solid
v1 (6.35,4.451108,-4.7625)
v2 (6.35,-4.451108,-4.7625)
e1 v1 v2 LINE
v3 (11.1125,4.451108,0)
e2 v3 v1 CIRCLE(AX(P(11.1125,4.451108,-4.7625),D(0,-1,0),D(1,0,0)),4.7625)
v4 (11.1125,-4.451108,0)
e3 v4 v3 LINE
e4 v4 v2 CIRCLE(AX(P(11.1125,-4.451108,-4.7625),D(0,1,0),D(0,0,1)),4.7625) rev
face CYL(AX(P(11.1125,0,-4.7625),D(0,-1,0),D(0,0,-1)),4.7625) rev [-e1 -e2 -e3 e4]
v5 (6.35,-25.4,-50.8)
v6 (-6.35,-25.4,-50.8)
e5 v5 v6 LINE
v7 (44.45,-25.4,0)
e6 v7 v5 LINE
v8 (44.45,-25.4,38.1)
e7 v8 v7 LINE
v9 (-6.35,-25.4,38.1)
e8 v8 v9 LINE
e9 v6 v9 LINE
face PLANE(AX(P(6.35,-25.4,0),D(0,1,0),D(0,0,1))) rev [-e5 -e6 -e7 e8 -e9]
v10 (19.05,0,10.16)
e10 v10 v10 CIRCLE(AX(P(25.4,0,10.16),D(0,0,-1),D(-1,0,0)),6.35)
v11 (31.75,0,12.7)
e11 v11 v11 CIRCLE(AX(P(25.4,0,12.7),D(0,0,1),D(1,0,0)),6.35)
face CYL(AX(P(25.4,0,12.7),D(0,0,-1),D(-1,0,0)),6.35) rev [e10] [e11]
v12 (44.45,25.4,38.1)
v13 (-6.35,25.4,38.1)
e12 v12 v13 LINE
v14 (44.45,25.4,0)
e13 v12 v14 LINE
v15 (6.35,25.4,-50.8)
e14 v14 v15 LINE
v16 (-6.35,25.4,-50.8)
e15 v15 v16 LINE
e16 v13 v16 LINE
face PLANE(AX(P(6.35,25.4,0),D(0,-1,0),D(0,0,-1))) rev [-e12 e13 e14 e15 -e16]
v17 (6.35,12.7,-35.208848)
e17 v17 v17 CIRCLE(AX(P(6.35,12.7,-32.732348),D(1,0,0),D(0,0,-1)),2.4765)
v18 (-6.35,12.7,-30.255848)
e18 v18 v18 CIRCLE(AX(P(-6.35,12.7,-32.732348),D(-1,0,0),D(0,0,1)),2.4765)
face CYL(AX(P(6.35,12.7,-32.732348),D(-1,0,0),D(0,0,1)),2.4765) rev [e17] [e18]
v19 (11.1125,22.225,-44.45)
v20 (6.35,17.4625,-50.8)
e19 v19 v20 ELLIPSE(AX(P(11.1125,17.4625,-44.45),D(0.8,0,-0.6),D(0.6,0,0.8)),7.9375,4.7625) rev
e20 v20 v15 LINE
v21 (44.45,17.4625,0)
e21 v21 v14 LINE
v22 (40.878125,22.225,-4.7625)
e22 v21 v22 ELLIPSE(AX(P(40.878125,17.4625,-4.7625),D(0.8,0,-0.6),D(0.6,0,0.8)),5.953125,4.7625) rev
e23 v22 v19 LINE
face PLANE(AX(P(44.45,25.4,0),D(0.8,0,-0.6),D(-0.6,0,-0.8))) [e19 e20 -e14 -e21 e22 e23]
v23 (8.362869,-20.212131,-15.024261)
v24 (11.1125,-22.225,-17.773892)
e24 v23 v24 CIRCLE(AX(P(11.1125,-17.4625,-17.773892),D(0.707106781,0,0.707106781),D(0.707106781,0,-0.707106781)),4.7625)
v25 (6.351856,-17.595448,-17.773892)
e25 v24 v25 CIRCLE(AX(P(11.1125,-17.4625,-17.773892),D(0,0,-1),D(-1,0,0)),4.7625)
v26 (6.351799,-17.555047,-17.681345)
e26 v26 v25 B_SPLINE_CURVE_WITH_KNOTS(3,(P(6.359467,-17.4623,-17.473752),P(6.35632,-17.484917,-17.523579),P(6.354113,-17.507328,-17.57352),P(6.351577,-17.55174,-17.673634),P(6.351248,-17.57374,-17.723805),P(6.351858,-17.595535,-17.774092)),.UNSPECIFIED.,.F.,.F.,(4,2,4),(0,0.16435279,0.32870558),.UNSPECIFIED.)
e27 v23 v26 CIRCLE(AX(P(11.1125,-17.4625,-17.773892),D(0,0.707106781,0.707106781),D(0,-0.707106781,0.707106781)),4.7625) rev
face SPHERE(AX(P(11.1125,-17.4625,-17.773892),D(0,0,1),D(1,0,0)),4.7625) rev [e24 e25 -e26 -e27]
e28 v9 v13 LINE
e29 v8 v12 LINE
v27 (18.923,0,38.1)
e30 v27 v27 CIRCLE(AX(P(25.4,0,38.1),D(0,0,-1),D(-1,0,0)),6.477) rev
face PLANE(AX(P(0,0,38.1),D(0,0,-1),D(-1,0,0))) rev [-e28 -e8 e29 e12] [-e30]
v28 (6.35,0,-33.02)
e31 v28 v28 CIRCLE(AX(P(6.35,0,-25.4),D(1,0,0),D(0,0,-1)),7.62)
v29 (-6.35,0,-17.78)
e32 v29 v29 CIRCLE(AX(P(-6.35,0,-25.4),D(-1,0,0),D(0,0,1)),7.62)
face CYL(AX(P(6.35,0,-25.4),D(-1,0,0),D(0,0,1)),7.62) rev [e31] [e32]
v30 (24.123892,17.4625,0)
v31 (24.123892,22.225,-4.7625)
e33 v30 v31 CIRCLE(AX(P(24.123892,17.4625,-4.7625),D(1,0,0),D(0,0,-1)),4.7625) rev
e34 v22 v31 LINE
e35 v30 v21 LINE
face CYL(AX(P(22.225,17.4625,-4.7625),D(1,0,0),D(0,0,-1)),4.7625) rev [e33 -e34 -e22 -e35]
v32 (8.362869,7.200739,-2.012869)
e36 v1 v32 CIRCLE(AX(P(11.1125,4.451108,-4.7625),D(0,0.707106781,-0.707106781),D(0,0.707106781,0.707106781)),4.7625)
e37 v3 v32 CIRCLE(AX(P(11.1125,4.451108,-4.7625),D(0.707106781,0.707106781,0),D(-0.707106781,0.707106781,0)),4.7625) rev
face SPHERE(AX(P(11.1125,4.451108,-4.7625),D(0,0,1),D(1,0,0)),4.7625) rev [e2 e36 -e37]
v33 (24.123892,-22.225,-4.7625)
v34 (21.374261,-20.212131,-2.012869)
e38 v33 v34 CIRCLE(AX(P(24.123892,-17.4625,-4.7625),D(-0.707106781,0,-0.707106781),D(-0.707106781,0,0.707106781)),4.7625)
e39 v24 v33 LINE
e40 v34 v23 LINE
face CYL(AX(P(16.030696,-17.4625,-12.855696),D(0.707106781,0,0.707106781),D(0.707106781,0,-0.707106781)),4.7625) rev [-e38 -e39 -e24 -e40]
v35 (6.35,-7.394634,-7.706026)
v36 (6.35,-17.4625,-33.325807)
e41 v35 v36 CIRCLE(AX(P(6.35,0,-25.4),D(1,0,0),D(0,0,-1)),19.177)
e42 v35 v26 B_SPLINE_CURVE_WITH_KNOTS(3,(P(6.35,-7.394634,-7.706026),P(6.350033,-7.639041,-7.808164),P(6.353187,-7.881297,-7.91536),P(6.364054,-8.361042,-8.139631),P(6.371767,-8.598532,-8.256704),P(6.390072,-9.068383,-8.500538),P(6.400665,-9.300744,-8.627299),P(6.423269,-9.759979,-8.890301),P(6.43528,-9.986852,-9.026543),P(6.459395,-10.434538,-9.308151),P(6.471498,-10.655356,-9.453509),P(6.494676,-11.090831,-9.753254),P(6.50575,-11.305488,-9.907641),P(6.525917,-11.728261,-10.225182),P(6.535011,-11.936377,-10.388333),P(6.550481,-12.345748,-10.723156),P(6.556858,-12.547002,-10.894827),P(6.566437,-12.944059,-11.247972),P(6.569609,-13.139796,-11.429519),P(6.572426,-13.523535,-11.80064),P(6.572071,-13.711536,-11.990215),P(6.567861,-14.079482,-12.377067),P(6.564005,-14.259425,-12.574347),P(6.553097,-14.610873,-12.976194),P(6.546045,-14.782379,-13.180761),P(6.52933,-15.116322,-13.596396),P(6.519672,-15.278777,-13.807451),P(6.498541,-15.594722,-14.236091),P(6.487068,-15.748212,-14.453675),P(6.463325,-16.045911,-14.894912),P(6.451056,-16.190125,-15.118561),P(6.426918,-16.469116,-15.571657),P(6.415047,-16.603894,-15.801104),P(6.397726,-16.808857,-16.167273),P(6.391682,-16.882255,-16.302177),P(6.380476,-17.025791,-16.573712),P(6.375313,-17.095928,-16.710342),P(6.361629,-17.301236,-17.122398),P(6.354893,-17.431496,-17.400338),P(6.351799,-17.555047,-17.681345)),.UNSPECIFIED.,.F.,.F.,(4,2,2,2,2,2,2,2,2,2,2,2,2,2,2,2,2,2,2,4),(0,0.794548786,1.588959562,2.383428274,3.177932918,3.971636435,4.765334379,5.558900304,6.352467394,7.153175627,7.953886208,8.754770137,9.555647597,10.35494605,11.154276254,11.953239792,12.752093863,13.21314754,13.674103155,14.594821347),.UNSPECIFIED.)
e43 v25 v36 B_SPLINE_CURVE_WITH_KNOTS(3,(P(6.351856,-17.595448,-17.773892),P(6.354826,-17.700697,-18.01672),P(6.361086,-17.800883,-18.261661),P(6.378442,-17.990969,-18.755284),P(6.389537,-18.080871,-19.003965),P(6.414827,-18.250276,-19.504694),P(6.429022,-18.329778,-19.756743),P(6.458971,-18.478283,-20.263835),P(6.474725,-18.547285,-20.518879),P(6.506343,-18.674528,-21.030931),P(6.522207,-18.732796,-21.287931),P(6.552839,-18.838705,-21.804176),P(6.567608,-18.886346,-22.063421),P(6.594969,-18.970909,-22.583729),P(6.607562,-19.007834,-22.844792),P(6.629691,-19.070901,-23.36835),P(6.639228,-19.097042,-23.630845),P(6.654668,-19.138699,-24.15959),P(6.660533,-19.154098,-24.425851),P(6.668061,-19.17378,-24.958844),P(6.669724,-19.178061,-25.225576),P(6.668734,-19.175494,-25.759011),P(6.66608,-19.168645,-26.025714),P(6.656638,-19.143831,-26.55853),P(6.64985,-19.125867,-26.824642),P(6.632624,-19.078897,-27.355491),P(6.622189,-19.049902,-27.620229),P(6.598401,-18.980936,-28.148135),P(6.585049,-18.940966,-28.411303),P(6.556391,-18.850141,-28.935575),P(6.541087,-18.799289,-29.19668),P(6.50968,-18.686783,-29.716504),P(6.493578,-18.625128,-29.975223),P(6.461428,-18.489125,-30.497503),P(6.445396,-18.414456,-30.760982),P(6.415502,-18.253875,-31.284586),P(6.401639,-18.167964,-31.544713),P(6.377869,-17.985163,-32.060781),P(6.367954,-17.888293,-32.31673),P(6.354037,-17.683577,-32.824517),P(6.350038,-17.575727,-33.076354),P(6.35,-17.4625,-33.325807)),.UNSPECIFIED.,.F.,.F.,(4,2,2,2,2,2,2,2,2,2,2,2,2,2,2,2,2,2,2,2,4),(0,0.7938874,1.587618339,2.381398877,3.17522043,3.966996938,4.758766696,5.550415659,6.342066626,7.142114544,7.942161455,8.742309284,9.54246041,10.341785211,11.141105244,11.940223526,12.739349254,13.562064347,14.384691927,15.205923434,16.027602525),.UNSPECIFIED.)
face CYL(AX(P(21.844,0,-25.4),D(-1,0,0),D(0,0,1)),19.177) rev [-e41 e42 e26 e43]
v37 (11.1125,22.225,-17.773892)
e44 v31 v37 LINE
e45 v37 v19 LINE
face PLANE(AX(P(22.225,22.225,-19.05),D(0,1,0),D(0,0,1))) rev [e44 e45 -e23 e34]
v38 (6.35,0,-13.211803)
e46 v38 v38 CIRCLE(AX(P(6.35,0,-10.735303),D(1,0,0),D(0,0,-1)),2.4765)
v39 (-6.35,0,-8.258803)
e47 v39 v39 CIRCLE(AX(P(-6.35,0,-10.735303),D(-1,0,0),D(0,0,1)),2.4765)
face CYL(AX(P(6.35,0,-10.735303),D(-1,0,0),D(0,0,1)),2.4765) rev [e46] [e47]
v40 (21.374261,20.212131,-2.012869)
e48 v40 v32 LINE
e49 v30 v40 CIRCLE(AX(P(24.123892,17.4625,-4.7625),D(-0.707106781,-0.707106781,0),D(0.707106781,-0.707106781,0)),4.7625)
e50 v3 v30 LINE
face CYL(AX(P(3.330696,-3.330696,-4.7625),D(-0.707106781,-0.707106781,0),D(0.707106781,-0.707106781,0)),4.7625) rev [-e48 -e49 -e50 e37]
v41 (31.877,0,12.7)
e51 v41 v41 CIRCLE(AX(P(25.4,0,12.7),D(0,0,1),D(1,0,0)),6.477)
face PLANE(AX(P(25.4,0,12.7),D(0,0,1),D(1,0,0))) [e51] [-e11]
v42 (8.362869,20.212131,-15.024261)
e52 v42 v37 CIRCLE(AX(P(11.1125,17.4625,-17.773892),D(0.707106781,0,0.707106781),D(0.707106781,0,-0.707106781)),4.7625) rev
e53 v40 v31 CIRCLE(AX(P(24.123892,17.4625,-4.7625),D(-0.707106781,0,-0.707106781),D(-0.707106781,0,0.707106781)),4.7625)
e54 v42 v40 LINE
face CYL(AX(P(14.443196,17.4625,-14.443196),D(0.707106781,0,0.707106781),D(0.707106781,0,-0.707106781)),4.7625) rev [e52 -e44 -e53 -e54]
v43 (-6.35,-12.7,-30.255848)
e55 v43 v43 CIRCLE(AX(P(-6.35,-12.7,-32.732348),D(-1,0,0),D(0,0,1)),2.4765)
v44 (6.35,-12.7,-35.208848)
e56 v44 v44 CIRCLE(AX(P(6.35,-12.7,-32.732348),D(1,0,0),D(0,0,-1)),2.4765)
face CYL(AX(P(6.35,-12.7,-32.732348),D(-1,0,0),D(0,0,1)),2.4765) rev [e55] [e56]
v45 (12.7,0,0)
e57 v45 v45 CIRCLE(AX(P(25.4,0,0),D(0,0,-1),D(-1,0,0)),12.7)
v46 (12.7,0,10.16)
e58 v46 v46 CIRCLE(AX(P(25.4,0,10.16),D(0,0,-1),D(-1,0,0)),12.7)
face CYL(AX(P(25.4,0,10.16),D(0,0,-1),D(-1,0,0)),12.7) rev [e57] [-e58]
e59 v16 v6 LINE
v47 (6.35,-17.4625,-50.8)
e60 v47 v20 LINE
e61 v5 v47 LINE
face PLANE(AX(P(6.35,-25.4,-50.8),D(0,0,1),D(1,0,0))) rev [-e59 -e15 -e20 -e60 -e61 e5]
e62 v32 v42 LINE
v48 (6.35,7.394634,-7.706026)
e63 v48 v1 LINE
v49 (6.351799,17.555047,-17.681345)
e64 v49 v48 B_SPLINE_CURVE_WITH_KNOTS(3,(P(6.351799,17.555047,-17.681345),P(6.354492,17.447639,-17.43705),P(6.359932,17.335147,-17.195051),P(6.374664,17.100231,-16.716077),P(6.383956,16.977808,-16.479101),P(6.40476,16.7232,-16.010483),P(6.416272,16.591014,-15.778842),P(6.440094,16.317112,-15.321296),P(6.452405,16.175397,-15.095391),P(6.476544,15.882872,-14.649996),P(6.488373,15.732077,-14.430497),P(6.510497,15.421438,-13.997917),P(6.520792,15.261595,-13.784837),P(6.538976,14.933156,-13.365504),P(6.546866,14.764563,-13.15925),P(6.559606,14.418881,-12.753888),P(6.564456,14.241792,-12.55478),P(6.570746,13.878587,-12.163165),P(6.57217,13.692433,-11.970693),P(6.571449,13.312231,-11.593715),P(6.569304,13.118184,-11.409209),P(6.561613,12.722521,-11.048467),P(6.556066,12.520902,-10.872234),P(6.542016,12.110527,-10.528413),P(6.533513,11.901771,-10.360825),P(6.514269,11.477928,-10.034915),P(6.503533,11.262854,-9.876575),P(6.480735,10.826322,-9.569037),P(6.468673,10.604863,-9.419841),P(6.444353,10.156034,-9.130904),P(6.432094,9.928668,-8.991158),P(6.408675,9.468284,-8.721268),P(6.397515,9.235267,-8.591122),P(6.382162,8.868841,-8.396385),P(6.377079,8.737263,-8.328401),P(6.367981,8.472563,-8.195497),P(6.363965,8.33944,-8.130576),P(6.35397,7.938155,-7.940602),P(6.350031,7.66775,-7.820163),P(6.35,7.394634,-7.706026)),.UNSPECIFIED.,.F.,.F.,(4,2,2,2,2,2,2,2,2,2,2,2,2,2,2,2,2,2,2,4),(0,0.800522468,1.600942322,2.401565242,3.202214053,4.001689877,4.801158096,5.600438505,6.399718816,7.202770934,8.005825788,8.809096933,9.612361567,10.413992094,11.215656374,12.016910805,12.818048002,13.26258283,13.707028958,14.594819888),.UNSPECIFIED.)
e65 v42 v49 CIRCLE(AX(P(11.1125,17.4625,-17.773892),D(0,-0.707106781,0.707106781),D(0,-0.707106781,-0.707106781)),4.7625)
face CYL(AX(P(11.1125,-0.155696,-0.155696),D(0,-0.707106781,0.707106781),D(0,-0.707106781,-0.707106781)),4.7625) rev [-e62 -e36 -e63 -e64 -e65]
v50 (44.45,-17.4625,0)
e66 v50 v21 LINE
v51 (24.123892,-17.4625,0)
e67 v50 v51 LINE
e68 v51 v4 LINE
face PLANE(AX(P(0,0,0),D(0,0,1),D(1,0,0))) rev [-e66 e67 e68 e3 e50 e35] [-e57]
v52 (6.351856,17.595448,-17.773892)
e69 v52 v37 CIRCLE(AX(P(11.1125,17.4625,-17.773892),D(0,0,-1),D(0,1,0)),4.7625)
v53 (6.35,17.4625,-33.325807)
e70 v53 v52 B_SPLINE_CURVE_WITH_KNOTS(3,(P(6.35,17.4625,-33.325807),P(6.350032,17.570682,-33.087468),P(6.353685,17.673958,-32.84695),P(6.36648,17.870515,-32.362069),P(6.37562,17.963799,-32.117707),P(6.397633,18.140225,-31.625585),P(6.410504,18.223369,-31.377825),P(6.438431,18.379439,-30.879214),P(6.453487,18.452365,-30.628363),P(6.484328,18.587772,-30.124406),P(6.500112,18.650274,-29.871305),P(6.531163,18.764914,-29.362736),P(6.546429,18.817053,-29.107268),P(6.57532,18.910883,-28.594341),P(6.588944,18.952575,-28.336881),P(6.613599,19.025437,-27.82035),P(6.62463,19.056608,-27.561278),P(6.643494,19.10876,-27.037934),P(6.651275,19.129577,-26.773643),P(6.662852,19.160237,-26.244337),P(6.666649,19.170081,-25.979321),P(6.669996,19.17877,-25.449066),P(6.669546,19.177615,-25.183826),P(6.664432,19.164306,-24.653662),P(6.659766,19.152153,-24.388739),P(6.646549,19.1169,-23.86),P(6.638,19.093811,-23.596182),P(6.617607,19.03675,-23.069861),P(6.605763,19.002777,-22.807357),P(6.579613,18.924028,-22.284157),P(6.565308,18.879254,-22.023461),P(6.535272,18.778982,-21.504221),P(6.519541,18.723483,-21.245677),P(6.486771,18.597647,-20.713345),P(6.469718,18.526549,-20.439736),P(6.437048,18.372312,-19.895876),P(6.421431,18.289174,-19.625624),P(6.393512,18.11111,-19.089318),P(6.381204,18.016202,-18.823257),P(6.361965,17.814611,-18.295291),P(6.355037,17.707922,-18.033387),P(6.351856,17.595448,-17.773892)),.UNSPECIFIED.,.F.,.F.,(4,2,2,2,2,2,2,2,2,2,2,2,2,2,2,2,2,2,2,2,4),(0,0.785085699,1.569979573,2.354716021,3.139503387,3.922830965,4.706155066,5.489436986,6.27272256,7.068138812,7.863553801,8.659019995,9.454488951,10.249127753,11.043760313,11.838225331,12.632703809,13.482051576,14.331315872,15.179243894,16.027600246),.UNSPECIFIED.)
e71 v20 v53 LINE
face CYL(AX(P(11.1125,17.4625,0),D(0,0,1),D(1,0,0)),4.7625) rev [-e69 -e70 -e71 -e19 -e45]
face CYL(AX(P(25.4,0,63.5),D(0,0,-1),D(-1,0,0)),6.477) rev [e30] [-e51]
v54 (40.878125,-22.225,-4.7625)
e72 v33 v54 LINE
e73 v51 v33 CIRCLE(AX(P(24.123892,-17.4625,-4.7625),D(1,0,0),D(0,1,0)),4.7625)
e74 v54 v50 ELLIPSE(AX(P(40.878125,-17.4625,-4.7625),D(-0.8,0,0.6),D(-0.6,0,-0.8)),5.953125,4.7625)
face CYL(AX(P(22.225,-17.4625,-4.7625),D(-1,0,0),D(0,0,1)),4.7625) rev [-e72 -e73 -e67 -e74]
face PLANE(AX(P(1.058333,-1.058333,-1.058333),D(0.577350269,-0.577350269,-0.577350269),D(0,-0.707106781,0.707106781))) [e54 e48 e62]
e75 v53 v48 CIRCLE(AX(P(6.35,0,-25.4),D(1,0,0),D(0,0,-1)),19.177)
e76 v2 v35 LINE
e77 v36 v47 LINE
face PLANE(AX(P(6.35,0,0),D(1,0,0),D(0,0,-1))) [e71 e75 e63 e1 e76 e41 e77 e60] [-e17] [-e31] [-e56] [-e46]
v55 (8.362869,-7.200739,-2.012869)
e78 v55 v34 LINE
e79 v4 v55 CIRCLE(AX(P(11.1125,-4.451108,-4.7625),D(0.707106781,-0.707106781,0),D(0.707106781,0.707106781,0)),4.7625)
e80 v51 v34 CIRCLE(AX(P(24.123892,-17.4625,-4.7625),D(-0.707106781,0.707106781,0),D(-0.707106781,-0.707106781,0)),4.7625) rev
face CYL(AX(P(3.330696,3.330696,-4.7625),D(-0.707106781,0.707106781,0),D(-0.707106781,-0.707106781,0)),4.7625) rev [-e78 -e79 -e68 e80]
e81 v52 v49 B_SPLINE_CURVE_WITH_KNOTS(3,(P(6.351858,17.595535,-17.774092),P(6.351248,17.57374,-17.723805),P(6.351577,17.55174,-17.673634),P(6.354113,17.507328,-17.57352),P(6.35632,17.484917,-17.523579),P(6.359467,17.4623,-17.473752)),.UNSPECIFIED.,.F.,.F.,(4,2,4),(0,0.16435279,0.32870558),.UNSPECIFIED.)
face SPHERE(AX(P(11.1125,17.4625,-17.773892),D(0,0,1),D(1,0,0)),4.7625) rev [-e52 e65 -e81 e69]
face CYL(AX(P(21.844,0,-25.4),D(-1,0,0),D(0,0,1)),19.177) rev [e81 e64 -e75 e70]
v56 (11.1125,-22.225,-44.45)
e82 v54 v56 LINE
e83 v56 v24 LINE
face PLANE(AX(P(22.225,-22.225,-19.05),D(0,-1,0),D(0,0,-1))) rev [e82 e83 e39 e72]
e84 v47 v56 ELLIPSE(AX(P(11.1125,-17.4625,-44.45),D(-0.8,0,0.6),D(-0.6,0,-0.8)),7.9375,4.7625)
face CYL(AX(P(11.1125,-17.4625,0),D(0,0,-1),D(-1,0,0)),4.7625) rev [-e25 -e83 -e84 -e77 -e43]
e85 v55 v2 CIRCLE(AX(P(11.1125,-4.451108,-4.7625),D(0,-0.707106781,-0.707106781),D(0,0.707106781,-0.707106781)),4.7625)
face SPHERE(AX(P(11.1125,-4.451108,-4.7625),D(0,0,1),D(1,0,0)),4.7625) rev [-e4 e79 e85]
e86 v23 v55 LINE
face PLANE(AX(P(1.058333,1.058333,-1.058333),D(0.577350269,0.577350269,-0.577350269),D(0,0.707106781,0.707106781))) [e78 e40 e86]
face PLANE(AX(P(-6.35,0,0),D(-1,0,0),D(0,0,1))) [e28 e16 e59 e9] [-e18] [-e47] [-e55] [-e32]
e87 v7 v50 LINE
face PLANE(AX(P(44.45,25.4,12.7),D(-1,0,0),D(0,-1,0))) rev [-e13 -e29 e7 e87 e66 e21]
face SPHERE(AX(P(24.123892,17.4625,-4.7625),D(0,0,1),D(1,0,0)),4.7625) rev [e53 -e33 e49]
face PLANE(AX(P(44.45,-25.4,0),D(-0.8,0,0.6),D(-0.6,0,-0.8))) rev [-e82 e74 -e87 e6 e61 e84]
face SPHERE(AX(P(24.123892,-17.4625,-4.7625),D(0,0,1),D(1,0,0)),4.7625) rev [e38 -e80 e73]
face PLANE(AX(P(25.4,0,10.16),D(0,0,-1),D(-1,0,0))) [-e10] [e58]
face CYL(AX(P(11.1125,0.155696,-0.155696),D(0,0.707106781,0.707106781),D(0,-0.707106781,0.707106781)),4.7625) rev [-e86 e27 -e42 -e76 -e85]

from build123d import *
from build123d.topology import SkipClean

# Parameters (mm, degrees)
SKETCH2_W           = 50.8
SKETCH2_H           = 50.8
SKETCH2_R           = 7.62
SKETCH2_R_2         = 2.4765
BOSS_EXTRUDE1_DEPTH = 6.35
SKETCH3_W           = 44.45
SKETCH3_H           = 50.8
SKETCH3_R           = 6.35
BOSS_EXTRUDE2_DEPTH = 12.7
SKETCH9_R           = 12.7
CUT_EXTRUDE2_DEPTH  = 10.16
RIB8_REACH          = 86.481
SKETCH13_WALL_W     = 234.462510634
SKETCH13_WALL_H     = 3.175
RIB9_REACH          = 86.481
SKETCH14_WALL_W     = 234.462510634
SKETCH14_WALL_H     = 3.175
BOSS_EXTRUDE5_REACH = 73.113
FILLET2_R           = 4.7625
SKETCH22_W          = 44.45
SKETCH22_H          = 50.8
BOSS_EXTRUDE6_DEPTH = 25.4
SKETCH20_R          = 6.477
CUT_EXTRUDE3_DEPTH  = 50.8
SKETCH23_R          = 19.177
CUT_EXTRUDE4_DEPTH  = 15.494
BOSS_EXTRUDE7_START = 6.35
SKETCH25_W          = 88.9
SKETCH25_H          = 50.8
SKETCH25_R          = 2.4765
SKETCH25_R_2        = 7.62
BOSS_EXTRUDE7_DEPTH = 6.35


with BuildPart() as part:
    # Sketch2 → Boss-Extrude1 (new body)
    with BuildSketch(Plane(origin=(0, 0, 0), x_dir=(0, 0, -1), z_dir=(1, 0, 0))):
        with Locations((25.4, 0)):
            Rectangle(SKETCH2_W, SKETCH2_H)
        with Locations((25.4, 0)):
            Circle(SKETCH2_R, mode=Mode.SUBTRACT)
        with Locations((32.732348419, 12.7)):
            Circle(SKETCH2_R_2, mode=Mode.SUBTRACT)
        with Locations((32.732348419, -12.7)):
            Circle(SKETCH2_R_2, mode=Mode.SUBTRACT)
        with Locations((10.735303163, 0)):
            Circle(SKETCH2_R_2, mode=Mode.SUBTRACT)
    extrude(amount=BOSS_EXTRUDE1_DEPTH)

    # Sketch3 → Boss-Extrude2 (add)
    with BuildSketch(Plane.XY):
        with Locations((22.225, 0)):
            Rectangle(SKETCH3_W, SKETCH3_H)
        with Locations((25.4, 0)):
            Circle(SKETCH3_R, mode=Mode.SUBTRACT)
    extrude(amount=BOSS_EXTRUDE2_DEPTH)

    # Sketch9 → Cut-Extrude2 (cut)
    with BuildSketch(Plane(origin=(0, 0, 0), x_dir=(-1, 0, 0), z_dir=(0, 0, -1))):
        with Locations((-25.4, 0)):
            Circle(SKETCH9_R)
    extrude(amount=-CUT_EXTRUDE2_DEPTH, mode=Mode.SUBTRACT)

    # Sketch13 wall → Rib8 (add, up to next)
    with BuildSketch(Plane(origin=(25.4, 25.4, -25.4), x_dir=(-0.6, 0, -0.8), z_dir=(-0.8, 0, 0.6)), mode=Mode.PRIVATE) as rib8_sk1:
        with Locations((0, 1.5875)):
            Rectangle(SKETCH13_WALL_W, SKETCH13_WALL_H)
    rib8_tool1 = extrude(rib8_sk1.sketch, amount=RIB8_REACH, mode=Mode.PRIVATE) - part.part
    add(rib8_tool1.solids().sort_by_distance((25.4, 25.4, -25.4))[0])

    # Sketch14 wall → Rib9 (add, up to next)
    with BuildSketch(Plane(origin=(25.4, -25.4, -25.4), x_dir=(-0.6, 0, -0.8), z_dir=(0.8, 0, -0.6)), mode=Mode.PRIVATE) as rib9_sk1:
        with Locations((0, 1.5875)):
            Rectangle(SKETCH14_WALL_W, SKETCH14_WALL_H)
    rib9_tool1 = extrude(rib9_sk1.sketch, amount=-RIB9_REACH, mode=Mode.PRIVATE) - part.part
    add(rib9_tool1.solids().sort_by_distance((25.4, -25.4, -25.4))[0])

    # Sketch17 → Boss-Extrude5 (add, up to next)
    with BuildSketch(Plane(origin=(1.058333333, 1.058333333, -1.058333333), x_dir=(0.8164965809277261, -0.408248290463863, 0.408248290463863), z_dir=(-0.5773502691896257, -0.5773502691896258, 0.5773502691896258)), mode=Mode.PRIVATE) as boss_extrude5_sk1:
        Polygon((6.480941611, -29.185832393), (6.480941611, -2.24506403), (29.812331411, -15.715448212), align=None)
    boss_extrude5_tool1 = extrude(boss_extrude5_sk1.sketch, amount=BOSS_EXTRUDE5_REACH, mode=Mode.PRIVATE) - part.part
    boss_extrude5 = boss_extrude5_tool1.solids().sort_by_distance((12.7, -15.875, -6.35))[0]
    add(boss_extrude5)

    # Mirror1: Boss-Extrude5 across plane
    add(boss_extrude5.mirror(Plane.ZX))

    # Fillet2
    fillet2_edges = [part.edges().sort_by_distance(p)[0] for p in [
        (34.925, 22.225, 0),
        (6.35, 22.225, -34.925),
        (6.35, -22.225, -34.925),
        (34.925, -22.225, 0),
        (6.35, 0, 0),
        (15.875, 22.225, -9.525),
        (15.875, 12.7, 0),
        (6.35, 12.7, -9.525),
        (6.35, -12.7, -9.525),
        (15.875, -22.225, -9.525),
        (15.875, -12.7, 0),
    ]]
    fillet(fillet2_edges, radius=FILLET2_R)

    # Sketch22 → Boss-Extrude6 (add)
    with BuildSketch(Plane.XY.offset(12.7)):
        with Locations((22.225, 0)):
            Rectangle(SKETCH22_W, SKETCH22_H)
    extrude(amount=BOSS_EXTRUDE6_DEPTH)

    # Sketch20 → Cut-Extrude3 (cut)
    with BuildSketch(Plane.XY.offset(12.7)):
        with Locations((25.4, 0)):
            Circle(SKETCH20_R)
    extrude(amount=CUT_EXTRUDE3_DEPTH, mode=Mode.SUBTRACT)

    # Sketch23 → Cut-Extrude4 (cut)
    with BuildSketch(Plane(origin=(6.35, 0, 0), x_dir=(0, 0, -1), z_dir=(1, 0, 0))):
        with Locations((25.4, 0)):
            Circle(SKETCH23_R)
    extrude(amount=CUT_EXTRUDE4_DEPTH, mode=Mode.SUBTRACT)

    # Sketch25 → Boss-Extrude7 (add)
    with SkipClean():  # the faces are left unmerged after this step: merging them gives an invalid solid
        with BuildSketch(Plane.ZY.offset(BOSS_EXTRUDE7_START)):
            with Locations((-6.35, 0)):
                Rectangle(SKETCH25_W, SKETCH25_H)
            with Locations((-32.732348419, -12.7)):
                Circle(SKETCH25_R, mode=Mode.SUBTRACT)
            with Locations((-10.735303163, 0)):
                Circle(SKETCH25_R, mode=Mode.SUBTRACT)
            with Locations((-32.732348419, 12.7)):
                Circle(SKETCH25_R, mode=Mode.SUBTRACT)
            with Locations((-25.4, 0)):
                Circle(SKETCH25_R_2, mode=Mode.SUBTRACT)
        extrude(amount=-BOSS_EXTRUDE7_DEPTH)


solid = part.part
